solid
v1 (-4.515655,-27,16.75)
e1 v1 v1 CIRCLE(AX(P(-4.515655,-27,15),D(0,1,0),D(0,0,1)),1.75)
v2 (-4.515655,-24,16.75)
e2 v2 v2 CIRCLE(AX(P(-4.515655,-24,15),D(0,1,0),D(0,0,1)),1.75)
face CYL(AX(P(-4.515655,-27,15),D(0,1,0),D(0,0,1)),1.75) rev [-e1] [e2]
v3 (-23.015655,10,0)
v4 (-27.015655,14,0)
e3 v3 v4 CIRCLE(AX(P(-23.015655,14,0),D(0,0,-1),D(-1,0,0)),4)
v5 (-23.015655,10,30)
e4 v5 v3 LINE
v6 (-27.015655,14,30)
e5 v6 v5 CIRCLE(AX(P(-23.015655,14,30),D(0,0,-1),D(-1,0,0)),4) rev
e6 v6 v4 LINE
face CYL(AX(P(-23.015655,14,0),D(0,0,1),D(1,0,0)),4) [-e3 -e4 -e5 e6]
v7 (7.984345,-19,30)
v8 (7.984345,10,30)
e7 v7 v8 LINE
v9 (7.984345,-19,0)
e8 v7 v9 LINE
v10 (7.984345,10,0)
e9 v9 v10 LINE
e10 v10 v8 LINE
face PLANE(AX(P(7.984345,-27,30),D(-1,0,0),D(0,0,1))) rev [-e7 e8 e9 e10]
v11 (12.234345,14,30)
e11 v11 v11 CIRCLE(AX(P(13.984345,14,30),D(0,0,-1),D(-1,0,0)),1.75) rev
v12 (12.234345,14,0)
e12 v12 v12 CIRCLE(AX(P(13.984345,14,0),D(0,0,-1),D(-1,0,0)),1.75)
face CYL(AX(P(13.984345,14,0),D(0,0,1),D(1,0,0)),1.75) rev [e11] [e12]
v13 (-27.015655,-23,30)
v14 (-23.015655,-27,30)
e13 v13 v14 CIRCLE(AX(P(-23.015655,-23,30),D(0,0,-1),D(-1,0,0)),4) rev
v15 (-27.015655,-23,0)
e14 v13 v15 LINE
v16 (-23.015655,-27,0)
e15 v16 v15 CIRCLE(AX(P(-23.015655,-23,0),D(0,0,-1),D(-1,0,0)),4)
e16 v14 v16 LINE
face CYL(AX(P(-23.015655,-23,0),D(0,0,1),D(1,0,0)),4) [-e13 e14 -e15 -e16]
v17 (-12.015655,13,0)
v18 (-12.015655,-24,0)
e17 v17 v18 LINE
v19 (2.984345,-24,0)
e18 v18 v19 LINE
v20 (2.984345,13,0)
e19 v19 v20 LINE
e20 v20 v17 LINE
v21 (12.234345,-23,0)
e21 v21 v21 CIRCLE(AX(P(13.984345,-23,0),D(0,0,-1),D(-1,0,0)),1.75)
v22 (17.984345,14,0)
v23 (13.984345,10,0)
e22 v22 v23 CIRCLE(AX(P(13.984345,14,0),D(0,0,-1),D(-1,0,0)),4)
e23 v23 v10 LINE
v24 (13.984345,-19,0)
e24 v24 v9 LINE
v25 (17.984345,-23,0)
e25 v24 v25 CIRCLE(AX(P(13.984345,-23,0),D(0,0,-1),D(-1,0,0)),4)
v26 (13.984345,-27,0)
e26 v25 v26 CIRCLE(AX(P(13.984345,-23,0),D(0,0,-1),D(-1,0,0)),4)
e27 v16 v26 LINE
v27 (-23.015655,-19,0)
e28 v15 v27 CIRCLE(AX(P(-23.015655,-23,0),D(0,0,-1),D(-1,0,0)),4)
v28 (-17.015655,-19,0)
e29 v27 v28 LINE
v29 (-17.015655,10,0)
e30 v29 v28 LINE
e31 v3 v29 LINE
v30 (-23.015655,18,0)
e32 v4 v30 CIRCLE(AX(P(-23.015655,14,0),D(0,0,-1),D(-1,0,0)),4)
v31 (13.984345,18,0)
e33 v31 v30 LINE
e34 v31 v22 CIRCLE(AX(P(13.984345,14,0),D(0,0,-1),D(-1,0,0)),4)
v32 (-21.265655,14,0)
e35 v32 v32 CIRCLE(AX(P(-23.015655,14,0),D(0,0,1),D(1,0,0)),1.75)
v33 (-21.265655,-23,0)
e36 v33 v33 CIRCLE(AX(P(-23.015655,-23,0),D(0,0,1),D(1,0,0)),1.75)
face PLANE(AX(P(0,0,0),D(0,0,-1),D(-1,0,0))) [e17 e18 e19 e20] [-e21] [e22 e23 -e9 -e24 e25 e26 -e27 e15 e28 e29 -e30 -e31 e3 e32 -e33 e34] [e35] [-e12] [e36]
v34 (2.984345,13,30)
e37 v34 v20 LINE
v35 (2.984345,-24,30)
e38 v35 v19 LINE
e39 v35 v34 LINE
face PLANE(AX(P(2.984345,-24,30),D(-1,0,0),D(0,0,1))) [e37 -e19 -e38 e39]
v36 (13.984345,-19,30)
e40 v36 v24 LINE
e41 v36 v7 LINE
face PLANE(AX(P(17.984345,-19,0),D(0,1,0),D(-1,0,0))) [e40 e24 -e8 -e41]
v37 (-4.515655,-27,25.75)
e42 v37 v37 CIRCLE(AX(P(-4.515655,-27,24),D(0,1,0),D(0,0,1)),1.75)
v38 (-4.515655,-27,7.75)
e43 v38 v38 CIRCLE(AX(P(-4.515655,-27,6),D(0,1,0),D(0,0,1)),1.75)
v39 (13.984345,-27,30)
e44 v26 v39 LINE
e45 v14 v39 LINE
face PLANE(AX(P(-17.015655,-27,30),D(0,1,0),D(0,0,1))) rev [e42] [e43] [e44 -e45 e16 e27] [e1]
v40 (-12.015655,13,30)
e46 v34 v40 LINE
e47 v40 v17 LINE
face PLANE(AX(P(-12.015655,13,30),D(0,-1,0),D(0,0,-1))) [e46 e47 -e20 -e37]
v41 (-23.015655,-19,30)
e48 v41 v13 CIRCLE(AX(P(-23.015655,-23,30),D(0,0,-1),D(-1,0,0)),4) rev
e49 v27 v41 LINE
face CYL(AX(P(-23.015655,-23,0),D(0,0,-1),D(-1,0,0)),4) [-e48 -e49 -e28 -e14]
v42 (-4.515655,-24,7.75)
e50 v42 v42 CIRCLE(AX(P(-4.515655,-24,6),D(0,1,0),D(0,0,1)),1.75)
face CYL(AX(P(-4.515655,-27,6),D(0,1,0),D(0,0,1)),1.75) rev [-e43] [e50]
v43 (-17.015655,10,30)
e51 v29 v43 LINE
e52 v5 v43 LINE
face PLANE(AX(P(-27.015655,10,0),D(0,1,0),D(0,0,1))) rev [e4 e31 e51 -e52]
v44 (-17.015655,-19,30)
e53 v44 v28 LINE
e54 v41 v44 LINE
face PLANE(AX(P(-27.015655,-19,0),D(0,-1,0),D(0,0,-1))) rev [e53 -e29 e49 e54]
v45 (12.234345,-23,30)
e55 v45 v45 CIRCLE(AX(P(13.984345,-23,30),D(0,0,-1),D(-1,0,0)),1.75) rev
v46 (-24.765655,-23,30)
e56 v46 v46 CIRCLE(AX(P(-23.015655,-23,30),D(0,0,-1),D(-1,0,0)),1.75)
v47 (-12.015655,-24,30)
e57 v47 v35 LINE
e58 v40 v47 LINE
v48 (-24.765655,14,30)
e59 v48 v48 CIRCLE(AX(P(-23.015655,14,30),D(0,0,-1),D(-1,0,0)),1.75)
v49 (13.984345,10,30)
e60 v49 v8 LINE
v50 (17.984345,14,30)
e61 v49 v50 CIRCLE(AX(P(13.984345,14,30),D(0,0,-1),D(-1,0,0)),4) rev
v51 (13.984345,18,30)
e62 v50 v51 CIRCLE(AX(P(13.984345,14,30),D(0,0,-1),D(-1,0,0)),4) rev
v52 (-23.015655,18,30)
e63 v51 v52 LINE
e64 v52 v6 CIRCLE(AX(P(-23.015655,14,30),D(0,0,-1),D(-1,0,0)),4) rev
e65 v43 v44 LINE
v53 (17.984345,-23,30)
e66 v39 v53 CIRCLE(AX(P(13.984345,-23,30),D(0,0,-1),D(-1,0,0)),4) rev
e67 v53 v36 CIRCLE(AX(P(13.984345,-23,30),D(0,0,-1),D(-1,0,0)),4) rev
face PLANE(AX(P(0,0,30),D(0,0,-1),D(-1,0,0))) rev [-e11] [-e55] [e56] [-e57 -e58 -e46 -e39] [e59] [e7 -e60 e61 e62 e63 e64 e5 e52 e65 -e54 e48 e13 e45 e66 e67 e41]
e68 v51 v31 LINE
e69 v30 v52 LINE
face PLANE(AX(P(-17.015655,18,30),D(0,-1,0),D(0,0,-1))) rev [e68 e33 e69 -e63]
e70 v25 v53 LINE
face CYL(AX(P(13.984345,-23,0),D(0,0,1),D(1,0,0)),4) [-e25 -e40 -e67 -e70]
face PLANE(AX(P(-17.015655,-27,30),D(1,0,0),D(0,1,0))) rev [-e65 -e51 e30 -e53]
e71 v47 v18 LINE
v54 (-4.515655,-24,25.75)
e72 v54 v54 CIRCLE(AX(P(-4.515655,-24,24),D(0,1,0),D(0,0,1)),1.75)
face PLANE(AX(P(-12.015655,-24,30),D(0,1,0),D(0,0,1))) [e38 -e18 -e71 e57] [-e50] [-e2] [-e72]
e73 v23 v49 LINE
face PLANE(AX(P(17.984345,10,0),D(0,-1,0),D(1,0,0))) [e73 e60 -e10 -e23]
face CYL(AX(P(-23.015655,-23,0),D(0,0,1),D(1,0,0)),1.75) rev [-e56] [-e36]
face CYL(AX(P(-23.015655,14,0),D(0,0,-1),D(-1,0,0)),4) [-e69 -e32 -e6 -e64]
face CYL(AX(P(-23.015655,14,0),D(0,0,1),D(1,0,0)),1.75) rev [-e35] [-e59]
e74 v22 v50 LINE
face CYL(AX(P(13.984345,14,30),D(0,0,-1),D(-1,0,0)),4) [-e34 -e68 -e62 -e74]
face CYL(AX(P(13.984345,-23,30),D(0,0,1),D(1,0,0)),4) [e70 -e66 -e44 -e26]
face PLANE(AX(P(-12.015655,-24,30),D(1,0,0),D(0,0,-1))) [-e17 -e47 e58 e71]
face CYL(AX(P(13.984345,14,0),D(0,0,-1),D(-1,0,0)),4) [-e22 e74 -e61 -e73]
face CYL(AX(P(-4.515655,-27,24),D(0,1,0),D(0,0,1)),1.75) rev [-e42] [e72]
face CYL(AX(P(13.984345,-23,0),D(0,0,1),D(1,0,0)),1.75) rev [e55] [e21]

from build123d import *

# Parameters (mm, degrees)
CROQUIS3_W               = 25
CROQUIS3_H               = 45
CROQUIS3_W_2             = 15
CROQUIS3_H_2             = 37
SALIENTE_EXTRUIR1_DEPTH  = 30
CROQUIS4_W               = 30
CROQUIS4_H               = 8
SALIENTE_EXTRUIR2_DEPTH  = 10
CROQUIS5_R               = 1.75
CORTAR_EXTRUIR1_DEPTH    = 49.567948266
REDONDEO1_R              = 4
REDONDEO1_OF_SIMETR_A1_R = 4
CROQUIS7_R               = 1.75
CORTAR_EXTRUIR2_DEPTH    = 59.25672149


with BuildPart() as part:
    # Croquis3 → Saliente-Extruir1 (new body)
    with BuildSketch(Plane.XY):
        with Locations((-4.515654699, -4.5)):
            Rectangle(CROQUIS3_W, CROQUIS3_H)
        with Locations((-4.515654699, -5.5)):
            Rectangle(CROQUIS3_W_2, CROQUIS3_H_2, mode=Mode.SUBTRACT)
    extrude(amount=SALIENTE_EXTRUIR1_DEPTH)

    # Croquis4 → Saliente-Extruir2 (add)
    with BuildSketch(Plane.ZY.offset(17.015654699)):
        with Locations((15, 14)):
            Rectangle(CROQUIS4_W, CROQUIS4_H)
        with Locations((15, -23)):
            Rectangle(CROQUIS4_W, CROQUIS4_H)
    saliente_extruir2 = extrude(amount=SALIENTE_EXTRUIR2_DEPTH)

    # Croquis5 → Cortar-Extruir1 (cut, symmetric)
    with BuildSketch(Plane.XY.offset(30)):
        with Locations((-23.015654699, 14)):
            Circle(CROQUIS5_R)
        with Locations((-23.015654699, -23)):
            Circle(CROQUIS5_R)
    cortar_extruir1 = extrude(amount=CORTAR_EXTRUIR1_DEPTH, both=True, mode=Mode.SUBTRACT)

    # Redondeo1
    redondeo1_edges = [part.edges().sort_by_distance(p)[0] for p in [
        (-27.015654699, -27, 15),
        (-27.015654699, -19, 15),
        (-27.015654699, 10, 15),
        (-27.015654699, 18, 15),
    ]]
    fillet(redondeo1_edges, radius=REDONDEO1_R - 0.0001)  # a hair under: the kernel refuses the full size

    # Simetría1: Saliente-Extruir2, Cortar-Extruir1 across plane
    add(saliente_extruir2.mirror(Plane.ZY.offset(4.515654699)))
    add(cortar_extruir1.mirror(Plane.ZY.offset(4.515654699)), mode=Mode.SUBTRACT)

    # Redondeo1 of Simetría1
    redondeo1_of_simetr_a1_edges = [part.edges().sort_by_distance(p)[0] for p in [
        (17.984345301, -27, 15),
        (17.984345301, -19, 15),
        (17.984345301, 10, 15),
        (17.984345301, 18, 15),
    ]]
    fillet(redondeo1_of_simetr_a1_edges, radius=REDONDEO1_OF_SIMETR_A1_R - 0.0001)  # a hair under: the kernel refuses the full size

    # Croquis7 → Cortar-Extruir2 (cut, through all)
    with BuildSketch(Plane(origin=(0, -24, 0), x_dir=(1, 0, 0), z_dir=(0, 1, 0))):
        with Locations(Location((-4.515654699, -24, 0), (0, 0, 270))):
            Circle(CROQUIS7_R)
        with Locations(Location((-4.515654699, -15, 0), (0, 0, 270))):
            Circle(CROQUIS7_R)
        with Locations(Location((-4.515654699, -6, 0), (0, 0, 270))):
            Circle(CROQUIS7_R)
    extrude(amount=-CORTAR_EXTRUIR2_DEPTH, mode=Mode.SUBTRACT)


solid = part.part
